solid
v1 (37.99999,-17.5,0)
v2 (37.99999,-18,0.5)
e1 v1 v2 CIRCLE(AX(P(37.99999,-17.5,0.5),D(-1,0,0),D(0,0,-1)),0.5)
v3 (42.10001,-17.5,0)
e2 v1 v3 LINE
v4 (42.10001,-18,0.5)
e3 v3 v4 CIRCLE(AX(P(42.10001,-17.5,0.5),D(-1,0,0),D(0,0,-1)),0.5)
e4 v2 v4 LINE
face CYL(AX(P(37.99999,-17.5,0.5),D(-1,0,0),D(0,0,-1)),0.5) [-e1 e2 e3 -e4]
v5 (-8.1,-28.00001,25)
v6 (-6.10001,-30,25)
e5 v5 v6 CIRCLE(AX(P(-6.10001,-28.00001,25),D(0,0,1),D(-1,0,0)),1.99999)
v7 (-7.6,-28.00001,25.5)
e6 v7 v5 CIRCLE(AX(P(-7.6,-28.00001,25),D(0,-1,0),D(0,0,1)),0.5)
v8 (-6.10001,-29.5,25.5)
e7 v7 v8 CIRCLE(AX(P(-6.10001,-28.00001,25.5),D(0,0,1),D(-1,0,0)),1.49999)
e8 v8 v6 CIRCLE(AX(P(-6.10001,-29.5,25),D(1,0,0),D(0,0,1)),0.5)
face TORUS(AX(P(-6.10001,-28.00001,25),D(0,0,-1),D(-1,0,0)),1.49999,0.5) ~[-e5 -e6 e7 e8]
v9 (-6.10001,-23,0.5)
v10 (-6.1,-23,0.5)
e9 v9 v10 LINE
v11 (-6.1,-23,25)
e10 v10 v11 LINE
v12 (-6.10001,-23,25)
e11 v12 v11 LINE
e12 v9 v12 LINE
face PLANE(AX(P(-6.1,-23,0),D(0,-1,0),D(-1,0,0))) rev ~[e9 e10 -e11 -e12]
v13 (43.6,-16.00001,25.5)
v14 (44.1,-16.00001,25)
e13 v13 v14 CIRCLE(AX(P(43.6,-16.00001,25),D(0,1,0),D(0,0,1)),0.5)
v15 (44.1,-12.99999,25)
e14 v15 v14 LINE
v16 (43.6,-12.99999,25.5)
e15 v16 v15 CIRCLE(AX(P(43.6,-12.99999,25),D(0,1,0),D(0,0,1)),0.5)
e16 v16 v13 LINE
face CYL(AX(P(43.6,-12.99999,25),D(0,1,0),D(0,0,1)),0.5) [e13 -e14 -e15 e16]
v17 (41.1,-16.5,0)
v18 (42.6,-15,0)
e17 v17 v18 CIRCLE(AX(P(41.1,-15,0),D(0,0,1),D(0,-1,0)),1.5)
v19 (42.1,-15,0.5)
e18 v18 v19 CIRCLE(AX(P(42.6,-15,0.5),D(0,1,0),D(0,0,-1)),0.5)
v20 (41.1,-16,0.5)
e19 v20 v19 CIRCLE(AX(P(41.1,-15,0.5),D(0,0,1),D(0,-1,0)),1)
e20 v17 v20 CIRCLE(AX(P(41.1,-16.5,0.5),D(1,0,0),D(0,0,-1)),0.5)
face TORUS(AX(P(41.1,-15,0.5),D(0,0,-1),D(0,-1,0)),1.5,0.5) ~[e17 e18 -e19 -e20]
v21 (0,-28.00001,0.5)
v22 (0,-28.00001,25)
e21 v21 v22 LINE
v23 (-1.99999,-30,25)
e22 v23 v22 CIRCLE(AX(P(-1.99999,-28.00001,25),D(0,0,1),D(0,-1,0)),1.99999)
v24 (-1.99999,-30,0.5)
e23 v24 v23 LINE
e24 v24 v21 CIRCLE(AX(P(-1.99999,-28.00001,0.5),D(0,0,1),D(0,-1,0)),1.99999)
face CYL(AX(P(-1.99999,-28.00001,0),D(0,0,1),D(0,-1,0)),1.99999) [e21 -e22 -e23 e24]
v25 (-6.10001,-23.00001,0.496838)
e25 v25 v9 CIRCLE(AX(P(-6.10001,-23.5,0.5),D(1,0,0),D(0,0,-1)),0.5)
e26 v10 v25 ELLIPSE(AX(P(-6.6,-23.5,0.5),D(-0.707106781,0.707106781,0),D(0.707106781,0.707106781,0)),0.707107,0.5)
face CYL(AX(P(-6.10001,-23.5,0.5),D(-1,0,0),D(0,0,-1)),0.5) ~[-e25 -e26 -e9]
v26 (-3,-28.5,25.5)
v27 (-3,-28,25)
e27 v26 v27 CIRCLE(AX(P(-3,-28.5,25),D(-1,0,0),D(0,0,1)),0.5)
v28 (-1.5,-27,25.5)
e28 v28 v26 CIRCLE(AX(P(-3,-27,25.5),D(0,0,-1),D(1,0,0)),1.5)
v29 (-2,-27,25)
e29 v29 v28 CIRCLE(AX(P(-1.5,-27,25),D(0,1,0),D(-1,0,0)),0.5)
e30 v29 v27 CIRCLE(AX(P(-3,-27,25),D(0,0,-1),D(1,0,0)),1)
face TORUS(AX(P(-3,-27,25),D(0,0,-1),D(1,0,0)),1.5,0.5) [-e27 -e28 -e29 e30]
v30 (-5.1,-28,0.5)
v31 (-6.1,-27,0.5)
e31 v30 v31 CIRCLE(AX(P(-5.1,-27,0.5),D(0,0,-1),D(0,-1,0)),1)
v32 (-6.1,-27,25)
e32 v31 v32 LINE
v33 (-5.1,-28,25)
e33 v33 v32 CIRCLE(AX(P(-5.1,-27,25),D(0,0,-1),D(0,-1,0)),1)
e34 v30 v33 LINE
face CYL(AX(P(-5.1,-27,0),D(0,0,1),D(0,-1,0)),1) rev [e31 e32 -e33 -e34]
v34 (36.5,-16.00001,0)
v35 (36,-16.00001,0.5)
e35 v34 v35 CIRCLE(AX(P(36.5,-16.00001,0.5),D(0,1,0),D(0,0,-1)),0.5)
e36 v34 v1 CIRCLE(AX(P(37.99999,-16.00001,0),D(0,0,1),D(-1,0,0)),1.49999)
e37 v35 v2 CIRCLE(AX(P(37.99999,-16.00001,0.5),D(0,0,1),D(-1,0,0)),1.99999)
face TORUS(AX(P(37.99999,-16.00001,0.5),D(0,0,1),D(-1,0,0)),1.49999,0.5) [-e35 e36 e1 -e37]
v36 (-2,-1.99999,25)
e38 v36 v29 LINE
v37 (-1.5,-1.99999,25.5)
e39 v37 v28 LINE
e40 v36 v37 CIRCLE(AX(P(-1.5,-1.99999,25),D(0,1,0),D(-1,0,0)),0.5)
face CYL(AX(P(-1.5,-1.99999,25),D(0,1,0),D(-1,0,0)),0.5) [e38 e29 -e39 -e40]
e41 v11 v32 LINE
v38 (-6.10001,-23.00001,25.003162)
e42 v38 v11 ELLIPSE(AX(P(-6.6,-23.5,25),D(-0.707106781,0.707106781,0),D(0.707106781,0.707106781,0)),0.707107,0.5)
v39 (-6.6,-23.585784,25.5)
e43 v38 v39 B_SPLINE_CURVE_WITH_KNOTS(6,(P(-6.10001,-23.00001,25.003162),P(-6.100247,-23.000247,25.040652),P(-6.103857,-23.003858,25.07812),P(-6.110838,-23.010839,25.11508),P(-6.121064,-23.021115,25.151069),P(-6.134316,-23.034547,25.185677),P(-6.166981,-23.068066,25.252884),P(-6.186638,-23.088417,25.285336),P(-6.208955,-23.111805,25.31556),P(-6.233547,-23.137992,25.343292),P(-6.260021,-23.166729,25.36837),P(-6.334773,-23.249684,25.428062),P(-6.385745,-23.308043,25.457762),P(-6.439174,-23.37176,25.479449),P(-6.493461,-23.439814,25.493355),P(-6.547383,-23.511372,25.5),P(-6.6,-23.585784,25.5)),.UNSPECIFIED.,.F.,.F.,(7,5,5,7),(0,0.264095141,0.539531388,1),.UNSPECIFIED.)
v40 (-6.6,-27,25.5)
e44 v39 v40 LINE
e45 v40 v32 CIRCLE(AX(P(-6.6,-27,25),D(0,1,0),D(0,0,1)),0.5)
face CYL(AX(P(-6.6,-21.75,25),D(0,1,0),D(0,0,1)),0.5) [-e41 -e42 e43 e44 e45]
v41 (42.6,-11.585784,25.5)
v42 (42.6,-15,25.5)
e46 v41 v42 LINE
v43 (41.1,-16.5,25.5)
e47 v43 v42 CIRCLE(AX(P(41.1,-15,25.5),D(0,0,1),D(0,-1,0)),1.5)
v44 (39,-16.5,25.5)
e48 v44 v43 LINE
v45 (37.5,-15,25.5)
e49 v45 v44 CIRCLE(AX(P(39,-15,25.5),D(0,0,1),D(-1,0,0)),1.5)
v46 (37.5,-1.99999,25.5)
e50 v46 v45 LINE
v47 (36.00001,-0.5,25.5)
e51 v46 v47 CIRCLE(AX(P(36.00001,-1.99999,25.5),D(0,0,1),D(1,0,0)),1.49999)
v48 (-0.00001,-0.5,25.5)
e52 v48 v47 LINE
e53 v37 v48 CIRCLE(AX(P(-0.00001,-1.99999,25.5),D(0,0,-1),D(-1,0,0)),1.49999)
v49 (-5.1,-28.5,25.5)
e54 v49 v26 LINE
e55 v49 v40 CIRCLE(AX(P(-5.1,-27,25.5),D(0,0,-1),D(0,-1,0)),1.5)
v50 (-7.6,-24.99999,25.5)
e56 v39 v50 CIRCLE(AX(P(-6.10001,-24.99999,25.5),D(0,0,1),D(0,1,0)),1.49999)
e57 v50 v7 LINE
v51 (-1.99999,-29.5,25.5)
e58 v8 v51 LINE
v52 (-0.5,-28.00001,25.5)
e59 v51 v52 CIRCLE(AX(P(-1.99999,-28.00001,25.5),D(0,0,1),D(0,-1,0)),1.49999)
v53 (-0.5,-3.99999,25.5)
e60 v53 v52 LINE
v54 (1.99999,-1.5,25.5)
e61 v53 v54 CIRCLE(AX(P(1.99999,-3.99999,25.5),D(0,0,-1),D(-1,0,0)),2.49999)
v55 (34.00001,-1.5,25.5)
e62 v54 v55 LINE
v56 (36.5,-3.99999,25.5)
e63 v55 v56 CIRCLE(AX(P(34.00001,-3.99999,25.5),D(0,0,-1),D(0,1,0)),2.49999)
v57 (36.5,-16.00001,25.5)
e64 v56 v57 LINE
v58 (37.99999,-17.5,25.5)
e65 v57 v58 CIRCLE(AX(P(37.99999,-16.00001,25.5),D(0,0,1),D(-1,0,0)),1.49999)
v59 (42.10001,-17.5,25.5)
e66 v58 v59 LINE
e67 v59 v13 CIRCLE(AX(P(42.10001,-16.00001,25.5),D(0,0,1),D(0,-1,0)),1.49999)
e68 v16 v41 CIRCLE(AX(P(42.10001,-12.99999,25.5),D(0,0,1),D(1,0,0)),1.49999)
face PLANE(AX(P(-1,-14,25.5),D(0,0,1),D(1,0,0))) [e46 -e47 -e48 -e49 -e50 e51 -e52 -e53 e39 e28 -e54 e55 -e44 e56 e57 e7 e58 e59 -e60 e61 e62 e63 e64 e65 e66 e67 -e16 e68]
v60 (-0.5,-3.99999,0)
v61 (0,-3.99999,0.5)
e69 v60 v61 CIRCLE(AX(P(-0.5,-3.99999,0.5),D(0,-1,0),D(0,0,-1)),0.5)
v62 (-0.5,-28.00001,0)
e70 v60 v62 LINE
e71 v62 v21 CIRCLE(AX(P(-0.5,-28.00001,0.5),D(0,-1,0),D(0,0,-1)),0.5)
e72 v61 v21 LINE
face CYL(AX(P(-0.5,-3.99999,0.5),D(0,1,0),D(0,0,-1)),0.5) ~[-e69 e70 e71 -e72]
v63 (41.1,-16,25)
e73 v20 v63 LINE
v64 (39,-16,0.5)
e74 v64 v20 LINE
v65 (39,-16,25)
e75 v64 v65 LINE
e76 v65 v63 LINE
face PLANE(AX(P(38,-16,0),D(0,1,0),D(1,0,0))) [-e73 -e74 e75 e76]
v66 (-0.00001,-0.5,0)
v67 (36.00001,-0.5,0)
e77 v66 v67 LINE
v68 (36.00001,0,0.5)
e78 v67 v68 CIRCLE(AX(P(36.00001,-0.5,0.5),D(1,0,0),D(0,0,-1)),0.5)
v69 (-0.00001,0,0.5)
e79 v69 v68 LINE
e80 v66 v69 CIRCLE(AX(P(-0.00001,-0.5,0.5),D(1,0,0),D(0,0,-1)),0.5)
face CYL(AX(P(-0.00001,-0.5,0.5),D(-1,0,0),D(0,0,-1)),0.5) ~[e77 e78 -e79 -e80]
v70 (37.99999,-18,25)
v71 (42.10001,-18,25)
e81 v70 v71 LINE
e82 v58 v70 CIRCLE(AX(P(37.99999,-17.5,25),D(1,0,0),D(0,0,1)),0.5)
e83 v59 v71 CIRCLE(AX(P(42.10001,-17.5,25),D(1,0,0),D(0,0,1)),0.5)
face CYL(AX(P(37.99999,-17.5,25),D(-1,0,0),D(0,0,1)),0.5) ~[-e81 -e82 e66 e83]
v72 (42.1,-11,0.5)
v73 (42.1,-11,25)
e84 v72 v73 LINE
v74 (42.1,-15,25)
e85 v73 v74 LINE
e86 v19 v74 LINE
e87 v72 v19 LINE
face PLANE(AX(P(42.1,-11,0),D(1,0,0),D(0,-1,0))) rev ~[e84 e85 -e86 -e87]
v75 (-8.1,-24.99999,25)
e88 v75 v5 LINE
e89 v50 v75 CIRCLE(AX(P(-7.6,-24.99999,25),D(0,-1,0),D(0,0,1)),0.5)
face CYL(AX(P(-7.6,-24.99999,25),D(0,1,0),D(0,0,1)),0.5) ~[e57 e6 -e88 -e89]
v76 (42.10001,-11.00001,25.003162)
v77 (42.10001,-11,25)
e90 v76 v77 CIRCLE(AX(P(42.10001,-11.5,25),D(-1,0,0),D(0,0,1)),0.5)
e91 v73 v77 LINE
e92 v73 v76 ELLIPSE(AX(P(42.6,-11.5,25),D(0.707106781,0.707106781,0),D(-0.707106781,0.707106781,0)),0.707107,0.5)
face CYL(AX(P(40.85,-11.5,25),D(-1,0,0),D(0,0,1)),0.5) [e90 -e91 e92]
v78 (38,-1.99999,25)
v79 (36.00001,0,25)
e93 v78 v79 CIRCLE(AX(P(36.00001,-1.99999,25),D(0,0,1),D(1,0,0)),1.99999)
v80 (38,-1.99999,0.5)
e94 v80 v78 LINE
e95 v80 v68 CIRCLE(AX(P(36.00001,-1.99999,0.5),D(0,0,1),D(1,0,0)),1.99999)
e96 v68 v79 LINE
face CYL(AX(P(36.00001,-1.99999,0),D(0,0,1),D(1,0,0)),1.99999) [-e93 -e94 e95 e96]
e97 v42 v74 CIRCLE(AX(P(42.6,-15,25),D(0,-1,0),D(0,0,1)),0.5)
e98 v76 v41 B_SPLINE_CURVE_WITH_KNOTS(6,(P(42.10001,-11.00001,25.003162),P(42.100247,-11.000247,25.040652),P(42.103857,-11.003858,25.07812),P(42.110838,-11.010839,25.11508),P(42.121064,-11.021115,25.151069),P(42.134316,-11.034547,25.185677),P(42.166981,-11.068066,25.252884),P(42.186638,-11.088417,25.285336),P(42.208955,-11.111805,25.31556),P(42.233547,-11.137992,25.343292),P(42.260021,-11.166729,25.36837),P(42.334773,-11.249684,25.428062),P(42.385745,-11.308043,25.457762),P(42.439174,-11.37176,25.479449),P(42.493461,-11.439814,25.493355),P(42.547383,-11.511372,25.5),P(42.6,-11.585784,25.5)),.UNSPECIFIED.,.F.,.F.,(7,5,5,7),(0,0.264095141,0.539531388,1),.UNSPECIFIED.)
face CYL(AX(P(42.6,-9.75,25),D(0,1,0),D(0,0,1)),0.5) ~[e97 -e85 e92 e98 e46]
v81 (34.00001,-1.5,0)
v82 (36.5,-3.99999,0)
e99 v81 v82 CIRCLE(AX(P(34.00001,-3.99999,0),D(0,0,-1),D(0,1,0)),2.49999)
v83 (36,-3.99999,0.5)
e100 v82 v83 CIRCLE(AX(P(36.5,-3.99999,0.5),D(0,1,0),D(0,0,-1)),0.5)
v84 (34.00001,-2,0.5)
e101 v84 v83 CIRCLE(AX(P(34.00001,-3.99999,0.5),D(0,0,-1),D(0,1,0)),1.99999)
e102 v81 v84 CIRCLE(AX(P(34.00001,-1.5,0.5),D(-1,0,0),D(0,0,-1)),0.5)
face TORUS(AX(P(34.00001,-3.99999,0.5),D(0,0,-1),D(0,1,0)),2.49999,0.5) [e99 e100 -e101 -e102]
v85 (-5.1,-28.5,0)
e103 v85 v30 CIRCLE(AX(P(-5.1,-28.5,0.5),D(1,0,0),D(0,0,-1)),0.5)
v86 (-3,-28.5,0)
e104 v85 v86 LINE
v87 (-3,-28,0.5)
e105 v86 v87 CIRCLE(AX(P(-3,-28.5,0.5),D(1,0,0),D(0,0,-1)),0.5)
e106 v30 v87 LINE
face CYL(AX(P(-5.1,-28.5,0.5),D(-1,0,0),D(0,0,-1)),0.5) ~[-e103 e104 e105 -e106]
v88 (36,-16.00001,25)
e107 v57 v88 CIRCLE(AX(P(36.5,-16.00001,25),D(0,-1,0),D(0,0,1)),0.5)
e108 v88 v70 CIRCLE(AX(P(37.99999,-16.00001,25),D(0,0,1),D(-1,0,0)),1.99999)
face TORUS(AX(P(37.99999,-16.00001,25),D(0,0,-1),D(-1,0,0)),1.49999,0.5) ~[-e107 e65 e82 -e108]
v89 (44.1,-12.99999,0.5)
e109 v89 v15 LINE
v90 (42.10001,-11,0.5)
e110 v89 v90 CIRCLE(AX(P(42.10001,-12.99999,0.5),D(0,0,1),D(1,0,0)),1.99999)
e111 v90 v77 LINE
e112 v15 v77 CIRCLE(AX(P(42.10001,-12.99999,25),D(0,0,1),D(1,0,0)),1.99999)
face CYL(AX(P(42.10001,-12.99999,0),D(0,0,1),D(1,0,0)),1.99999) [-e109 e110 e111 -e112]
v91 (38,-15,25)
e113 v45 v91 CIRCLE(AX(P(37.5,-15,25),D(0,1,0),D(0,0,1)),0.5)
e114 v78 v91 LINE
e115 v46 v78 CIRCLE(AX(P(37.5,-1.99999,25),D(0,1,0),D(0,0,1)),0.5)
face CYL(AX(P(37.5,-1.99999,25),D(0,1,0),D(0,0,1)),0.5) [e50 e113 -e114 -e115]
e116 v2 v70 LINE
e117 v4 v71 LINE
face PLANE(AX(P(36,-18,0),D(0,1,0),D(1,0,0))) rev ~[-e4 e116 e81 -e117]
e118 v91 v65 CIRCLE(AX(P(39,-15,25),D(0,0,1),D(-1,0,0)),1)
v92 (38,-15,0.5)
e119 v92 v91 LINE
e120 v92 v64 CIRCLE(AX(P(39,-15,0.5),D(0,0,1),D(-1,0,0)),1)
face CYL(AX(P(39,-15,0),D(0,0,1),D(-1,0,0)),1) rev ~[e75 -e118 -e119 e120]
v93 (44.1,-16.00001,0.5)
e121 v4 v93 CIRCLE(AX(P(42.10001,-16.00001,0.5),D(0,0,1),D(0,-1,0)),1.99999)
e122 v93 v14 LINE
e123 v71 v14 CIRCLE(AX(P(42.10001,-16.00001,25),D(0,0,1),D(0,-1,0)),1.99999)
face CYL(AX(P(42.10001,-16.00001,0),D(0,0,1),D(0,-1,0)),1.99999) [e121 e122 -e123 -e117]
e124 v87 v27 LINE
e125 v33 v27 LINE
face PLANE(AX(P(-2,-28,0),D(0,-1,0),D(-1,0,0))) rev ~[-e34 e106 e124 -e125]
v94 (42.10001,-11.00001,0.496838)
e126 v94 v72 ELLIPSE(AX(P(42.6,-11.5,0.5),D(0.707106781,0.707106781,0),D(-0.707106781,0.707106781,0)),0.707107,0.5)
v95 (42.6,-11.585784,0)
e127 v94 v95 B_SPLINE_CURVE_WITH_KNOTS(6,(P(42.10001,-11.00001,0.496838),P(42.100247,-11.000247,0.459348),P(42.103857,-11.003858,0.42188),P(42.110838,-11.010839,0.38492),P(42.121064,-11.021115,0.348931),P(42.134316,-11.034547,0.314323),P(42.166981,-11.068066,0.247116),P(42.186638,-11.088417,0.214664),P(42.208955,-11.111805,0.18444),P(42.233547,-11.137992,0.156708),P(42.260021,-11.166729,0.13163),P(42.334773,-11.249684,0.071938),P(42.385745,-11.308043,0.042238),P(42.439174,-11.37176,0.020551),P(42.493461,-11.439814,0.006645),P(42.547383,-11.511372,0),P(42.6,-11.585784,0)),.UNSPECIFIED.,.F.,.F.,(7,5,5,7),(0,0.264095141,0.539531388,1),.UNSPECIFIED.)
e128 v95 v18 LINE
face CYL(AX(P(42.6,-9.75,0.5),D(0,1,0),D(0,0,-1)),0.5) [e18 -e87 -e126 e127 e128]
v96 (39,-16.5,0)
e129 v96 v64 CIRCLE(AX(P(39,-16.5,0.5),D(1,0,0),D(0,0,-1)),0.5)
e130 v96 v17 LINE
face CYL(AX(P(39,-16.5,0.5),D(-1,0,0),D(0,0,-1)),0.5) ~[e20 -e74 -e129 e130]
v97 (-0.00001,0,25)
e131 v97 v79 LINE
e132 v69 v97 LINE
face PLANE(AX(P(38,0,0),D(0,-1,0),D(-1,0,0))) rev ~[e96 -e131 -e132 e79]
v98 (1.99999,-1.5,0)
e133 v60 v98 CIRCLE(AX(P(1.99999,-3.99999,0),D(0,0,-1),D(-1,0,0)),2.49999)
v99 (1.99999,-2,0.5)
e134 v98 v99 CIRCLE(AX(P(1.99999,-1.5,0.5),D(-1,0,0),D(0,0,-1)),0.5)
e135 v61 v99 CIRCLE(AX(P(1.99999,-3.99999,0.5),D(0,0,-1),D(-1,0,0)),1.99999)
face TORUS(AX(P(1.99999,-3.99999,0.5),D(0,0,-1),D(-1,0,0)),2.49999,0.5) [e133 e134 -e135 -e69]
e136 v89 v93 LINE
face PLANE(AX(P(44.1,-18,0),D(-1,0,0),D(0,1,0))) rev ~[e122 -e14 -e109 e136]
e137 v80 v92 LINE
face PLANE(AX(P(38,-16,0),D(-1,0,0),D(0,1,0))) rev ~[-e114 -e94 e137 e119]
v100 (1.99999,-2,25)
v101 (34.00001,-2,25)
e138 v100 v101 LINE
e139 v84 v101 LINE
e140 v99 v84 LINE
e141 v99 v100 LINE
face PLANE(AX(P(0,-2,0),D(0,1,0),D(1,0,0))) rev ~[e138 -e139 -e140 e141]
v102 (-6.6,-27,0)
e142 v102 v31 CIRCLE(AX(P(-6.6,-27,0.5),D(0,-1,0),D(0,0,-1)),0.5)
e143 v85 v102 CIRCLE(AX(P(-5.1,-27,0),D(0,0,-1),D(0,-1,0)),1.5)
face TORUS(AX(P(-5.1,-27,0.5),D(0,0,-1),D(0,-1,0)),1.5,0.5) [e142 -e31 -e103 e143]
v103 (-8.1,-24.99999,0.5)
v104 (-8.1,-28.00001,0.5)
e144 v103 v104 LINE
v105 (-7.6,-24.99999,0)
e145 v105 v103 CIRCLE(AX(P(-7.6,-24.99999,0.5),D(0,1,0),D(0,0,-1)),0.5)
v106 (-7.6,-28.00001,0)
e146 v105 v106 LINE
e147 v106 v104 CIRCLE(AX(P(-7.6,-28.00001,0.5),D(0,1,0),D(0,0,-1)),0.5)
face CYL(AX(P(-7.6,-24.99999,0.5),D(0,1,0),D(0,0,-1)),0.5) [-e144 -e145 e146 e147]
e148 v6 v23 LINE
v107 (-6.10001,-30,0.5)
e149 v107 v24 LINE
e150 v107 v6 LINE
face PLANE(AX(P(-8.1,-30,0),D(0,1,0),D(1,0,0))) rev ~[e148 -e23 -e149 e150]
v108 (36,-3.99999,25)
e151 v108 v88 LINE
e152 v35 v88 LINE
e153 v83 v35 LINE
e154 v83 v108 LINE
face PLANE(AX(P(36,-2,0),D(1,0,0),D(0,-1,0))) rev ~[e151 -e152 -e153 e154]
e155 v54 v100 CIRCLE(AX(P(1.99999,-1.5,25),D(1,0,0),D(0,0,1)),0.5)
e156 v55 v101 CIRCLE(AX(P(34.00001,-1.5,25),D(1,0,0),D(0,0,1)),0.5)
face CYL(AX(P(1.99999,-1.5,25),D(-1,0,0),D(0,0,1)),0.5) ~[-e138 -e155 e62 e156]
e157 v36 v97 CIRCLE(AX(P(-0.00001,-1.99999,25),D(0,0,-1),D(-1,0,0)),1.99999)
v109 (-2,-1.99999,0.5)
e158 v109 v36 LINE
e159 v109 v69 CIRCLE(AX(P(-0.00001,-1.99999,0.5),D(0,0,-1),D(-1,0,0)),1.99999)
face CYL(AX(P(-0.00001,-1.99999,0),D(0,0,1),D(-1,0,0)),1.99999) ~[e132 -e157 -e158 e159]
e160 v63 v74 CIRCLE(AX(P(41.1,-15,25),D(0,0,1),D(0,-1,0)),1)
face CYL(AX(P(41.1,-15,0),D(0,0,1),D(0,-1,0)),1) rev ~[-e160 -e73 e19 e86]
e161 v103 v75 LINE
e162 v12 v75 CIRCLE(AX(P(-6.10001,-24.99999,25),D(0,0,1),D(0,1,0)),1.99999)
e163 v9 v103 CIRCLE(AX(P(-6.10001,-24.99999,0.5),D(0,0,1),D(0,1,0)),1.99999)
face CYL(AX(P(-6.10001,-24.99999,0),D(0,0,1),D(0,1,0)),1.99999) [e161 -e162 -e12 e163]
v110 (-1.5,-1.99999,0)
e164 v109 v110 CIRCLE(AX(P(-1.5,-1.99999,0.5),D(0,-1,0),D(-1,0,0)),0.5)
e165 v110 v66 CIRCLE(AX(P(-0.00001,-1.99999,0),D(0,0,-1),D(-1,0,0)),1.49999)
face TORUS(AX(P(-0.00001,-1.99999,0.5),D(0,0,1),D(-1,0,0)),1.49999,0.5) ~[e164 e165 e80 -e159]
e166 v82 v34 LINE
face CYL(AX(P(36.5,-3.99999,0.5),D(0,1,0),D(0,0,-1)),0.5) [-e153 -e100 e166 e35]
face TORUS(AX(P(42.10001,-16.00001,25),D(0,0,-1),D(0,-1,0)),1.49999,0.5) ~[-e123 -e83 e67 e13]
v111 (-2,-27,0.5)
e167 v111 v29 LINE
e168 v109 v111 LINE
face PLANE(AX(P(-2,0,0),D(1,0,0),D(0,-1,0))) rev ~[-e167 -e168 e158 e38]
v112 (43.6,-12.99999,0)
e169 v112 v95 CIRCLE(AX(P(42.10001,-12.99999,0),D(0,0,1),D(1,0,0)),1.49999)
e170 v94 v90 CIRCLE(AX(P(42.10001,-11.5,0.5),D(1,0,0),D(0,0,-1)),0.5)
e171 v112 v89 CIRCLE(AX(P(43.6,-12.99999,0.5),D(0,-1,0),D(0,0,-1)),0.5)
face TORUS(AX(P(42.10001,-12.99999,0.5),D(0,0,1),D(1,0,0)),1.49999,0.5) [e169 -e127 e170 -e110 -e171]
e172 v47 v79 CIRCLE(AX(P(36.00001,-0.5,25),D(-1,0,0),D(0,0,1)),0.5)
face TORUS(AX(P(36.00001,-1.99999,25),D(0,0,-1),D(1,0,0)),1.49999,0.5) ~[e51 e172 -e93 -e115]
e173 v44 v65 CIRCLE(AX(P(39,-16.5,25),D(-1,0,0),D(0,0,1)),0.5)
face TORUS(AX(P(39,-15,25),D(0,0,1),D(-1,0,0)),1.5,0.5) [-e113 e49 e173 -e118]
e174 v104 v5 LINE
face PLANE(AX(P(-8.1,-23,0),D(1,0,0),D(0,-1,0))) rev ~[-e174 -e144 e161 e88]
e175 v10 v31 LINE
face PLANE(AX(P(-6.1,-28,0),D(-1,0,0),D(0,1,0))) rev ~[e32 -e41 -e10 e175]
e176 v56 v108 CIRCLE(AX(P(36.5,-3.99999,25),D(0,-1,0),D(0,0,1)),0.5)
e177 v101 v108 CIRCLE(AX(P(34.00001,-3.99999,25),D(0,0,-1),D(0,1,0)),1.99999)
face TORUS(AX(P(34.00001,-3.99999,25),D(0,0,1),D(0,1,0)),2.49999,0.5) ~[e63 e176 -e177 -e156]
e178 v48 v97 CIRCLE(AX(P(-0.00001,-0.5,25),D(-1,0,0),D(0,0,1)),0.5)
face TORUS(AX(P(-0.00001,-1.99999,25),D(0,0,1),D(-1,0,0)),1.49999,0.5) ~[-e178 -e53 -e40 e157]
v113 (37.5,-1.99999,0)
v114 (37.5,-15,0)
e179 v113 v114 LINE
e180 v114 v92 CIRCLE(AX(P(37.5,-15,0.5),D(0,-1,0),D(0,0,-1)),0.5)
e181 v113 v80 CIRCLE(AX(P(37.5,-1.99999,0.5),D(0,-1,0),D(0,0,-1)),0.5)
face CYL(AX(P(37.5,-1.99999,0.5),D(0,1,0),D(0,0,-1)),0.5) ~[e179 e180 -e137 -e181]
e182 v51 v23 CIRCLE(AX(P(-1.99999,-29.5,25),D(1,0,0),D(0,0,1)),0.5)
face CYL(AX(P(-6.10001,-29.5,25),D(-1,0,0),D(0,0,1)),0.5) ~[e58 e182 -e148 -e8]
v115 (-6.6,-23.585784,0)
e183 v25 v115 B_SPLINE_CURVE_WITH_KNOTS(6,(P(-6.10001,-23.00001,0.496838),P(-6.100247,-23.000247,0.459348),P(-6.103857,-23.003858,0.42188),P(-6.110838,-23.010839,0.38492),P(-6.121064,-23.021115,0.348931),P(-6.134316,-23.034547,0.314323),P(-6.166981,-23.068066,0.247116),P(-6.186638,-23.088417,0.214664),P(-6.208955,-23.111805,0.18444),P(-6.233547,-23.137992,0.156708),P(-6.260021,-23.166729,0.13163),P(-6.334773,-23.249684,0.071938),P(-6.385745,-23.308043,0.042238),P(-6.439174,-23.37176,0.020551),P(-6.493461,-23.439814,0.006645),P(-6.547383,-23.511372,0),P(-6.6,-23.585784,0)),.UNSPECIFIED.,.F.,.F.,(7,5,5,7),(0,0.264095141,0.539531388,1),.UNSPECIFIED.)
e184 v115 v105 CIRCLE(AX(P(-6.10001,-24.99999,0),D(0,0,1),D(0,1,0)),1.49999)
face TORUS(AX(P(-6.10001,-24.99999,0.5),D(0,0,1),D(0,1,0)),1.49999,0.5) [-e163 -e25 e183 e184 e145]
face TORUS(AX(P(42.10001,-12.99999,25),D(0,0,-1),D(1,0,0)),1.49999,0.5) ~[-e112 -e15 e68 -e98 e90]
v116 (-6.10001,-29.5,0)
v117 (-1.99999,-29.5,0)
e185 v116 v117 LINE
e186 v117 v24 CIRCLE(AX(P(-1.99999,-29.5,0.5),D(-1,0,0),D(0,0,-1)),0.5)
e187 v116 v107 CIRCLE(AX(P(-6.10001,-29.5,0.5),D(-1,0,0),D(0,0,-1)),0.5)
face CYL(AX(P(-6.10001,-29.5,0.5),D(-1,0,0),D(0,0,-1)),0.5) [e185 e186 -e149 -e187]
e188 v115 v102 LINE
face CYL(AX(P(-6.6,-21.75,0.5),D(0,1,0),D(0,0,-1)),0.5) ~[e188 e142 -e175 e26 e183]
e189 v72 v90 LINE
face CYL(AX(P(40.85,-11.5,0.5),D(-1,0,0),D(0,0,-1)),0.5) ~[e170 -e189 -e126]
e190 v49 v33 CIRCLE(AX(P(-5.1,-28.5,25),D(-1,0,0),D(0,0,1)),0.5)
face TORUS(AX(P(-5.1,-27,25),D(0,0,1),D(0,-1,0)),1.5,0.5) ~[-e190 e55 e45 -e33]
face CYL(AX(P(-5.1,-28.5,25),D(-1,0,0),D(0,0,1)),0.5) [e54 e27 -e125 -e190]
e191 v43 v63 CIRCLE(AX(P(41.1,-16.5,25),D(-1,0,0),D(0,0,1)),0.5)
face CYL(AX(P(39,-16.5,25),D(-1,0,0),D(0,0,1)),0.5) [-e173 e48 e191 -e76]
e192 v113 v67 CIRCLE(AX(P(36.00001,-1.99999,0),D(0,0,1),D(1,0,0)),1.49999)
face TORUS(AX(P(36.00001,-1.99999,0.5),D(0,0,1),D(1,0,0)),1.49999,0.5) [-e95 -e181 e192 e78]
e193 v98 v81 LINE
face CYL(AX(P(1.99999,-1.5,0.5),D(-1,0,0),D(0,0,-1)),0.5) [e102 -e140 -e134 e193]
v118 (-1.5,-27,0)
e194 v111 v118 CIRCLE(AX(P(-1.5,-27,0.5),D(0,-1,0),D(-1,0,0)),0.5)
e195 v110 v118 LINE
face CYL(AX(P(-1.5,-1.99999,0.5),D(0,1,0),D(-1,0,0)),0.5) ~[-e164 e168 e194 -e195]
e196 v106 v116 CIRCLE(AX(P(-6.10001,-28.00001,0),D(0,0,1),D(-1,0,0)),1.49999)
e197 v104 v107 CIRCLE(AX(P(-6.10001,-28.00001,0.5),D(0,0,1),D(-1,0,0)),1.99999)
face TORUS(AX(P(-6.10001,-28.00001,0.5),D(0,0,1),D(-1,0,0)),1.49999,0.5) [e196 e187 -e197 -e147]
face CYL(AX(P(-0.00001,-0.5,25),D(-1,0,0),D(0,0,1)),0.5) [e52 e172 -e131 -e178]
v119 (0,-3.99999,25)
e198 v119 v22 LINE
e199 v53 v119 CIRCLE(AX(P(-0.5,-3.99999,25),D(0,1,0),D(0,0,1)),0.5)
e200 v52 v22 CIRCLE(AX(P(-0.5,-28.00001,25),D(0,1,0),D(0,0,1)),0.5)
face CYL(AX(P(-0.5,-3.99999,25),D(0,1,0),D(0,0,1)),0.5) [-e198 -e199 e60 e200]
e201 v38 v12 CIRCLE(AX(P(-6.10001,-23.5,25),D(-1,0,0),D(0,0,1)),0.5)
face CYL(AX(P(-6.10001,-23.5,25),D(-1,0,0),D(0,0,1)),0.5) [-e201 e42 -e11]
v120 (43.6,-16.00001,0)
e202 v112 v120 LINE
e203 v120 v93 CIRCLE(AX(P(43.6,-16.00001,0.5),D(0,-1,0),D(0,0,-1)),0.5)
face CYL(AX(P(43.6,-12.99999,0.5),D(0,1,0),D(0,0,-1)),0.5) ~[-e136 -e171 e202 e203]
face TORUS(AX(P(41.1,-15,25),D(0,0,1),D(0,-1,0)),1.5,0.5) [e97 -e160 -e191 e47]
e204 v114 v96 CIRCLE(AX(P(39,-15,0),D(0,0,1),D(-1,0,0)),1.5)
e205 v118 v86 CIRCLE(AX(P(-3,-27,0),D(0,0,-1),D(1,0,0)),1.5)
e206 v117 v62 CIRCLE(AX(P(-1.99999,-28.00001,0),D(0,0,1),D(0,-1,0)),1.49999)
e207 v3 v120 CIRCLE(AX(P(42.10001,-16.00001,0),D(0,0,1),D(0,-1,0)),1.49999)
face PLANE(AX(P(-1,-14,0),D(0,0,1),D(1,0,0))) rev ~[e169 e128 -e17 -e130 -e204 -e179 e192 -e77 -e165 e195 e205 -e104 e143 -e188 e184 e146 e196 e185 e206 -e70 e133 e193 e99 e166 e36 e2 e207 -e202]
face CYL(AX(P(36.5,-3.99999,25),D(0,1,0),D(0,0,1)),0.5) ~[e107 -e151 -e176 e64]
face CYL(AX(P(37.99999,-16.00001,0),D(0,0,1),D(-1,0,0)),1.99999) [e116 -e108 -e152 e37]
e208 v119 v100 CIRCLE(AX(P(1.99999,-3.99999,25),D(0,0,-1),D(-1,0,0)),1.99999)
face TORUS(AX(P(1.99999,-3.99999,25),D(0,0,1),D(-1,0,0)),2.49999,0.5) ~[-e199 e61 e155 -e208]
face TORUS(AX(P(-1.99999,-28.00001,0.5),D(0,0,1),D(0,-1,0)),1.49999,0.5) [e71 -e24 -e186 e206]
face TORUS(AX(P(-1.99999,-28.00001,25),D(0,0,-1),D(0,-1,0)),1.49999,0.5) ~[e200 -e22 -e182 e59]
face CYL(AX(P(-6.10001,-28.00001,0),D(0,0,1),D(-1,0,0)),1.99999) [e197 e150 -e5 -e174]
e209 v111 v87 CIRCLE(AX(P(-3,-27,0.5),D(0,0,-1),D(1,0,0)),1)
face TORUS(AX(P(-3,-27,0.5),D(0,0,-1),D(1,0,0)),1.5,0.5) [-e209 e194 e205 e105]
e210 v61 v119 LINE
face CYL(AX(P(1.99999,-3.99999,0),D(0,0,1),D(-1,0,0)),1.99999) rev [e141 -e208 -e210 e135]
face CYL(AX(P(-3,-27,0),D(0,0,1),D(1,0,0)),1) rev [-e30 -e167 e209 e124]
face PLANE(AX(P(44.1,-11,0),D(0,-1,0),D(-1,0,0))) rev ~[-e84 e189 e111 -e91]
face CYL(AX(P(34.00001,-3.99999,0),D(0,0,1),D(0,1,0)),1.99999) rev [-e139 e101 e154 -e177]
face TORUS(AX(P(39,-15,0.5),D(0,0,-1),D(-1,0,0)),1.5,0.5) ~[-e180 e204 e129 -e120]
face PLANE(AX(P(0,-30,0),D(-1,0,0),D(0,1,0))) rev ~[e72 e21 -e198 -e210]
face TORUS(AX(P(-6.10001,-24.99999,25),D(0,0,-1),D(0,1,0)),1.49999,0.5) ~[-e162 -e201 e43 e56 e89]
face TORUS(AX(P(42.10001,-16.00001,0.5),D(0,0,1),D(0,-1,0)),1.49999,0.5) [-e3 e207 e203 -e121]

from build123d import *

# Parameters (mm, degrees)
F0_W         = 36
F0_H         = 2
F0_W_2       = 2
F0_W_3       = 4.1
F1_DEPTH     = 25.5
F2_R         = 1.99999
F3_R         = 1
F4_T1_DEPTH  = 36.00002
F4_T3_DEPTH  = 32.00002
F4_T5_DEPTH  = 25.00001
F4_T7_DEPTH  = 2.1
F4_T9_DEPTH  = 5.25
F4_T11_DEPTH = 13.00001
F4_T13_DEPTH = 1.25001
F4_T15_DEPTH = 2.1
F4_T17_DEPTH = 3.00002
F4_T19_DEPTH = 5.25
F4_T21_DEPTH = 4.10002
F4_T23_DEPTH = 1.25001
F4_T25_DEPTH = 24.00002
F4_T27_DEPTH = 3.00002
F4_T29_DEPTH = 4.10002
F4_T31_DEPTH = 12.00002
F4_T34_ANGLE = 90
F4_T36_ANGLE = 90
F4_T38_ANGLE = 90
F4_T40_ANGLE = 90
F4_T42_ANGLE = 90
F4_T44_ANGLE = 90
F4_T46_ANGLE = 90
F4_T48_ANGLE = 90
F4_T50_ANGLE = 90
F4_T52_ANGLE = 90
F4_T54_ANGLE = 90
F4_T56_ANGLE = 90
F4_T58_ANGLE = 90
F4_T60_ANGLE = 90
F4_T62_ANGLE = 90
F4_T64_ANGLE = 90
F4_T66_ANGLE = 90
F4_T68_ANGLE = 90
F4_T70_ANGLE = 90
F4_T72_ANGLE = 90
F4_T74_ANGLE = 90
F4_T76_ANGLE = 90
F4_T78_ANGLE = 90
F4_T80_ANGLE = 90
F4_T82_ANGLE = 90
F4_T84_ANGLE = 90
F4_T86_ANGLE = 90
F4_T88_ANGLE = 90


# Not quite as in the source:
# - a fillet or chamfer that OpenCascade refuses, or shapes differently, is made with other operations: its cross-section is extruded or revolved along the edge and cut away or added
# - a fillet or chamfer is up to 0.001 mm smaller than in the source, because OpenCascade refuses the exact size


with BuildPart() as f1:
    # F0 (on Top) → F1 (new body)
    with BuildSketch(Plane.XY):
        Polygon((0, -2), (0, 0), (-2, 0), (-2, -28), (0, -28), align=None)
        with Locations((18, -1)):
            Rectangle(F0_W, F0_H)
        Polygon((38, 0), (36, 0), (36, -2), (36, -16), (38, -16), align=None)
        with Locations((37, -17)):
            Rectangle(F0_W_2, F0_H)
        with Locations((40.05, -17)):
            Rectangle(F0_W_3, F0_H)
        Polygon((42.1, -11), (42.1, -16), (42.1, -18), (44.1, -18), (44.1, -11), align=None)
        Polygon((0, -30), (0, -28), (-2, -28), (-6.1, -28), (-6.1, -30), align=None)
        Polygon((-6.1, -30), (-6.1, -28), (-6.1, -23), (-8.1, -23), (-8.1, -30), align=None)
    extrude(amount=F1_DEPTH)

    # F2 (radius 2 in the source; OpenCascade refuses exactly that, so slightly less here)
    f2_edges = [f1.edges().sort_by_distance(p)[0] for p in [
        (0, -30, 12.75),
        (36, -18, 12.75),
        (-8.1, -30, 12.75),
        (44.1, -18, 12.75),
        (0, -2, 12.75),
        (36, -2, 12.75),
        (-2, 0, 12.75),
        (38, 0, 12.75),
        (44.1, -11, 12.75),
        (-8.1, -23, 12.75),
    ]]
    fillet(f2_edges, radius=F2_R)

    # F3
    f3_edges = [f1.edges().sort_by_distance(p)[0] for p in [
        (-2, -28, 12.75),
        (-6.1, -28, 12.75),
        (42.1, -16, 12.75),
        (38, -16, 12.75),
    ]]
    fillet(f3_edges, radius=F3_R)

    # F4: fillet of radius 0.5 on 58 edges, made by hand

    # F4_s2 → F4_t1 (cut)
    with BuildSketch(Plane.YZ.offset(-1e-05)):
        with BuildLine():
            ThreePointArc((-0.5, 25.5), (-0.1464466094, 25.3535533906), (0, 25))
            Line((0, 25), (0, 25.5))
            Line((0, 25.5), (-0.5, 25.5))
        make_face()
        with BuildLine():
            ThreePointArc((-0.5, 0), (-0.1464466094, 0.1464466094), (0, 0.5))
            Line((0, 0.5), (0, 0))
            Line((0, 0), (-0.5, 0))
        make_face()
    extrude(amount=F4_T1_DEPTH, mode=Mode.SUBTRACT)

    # F4_s4 → F4_t3 (cut)
    with BuildSketch(Plane.YZ.offset(1.99999)):
        with BuildLine():
            ThreePointArc((-1.5, 0), (-1.8535533906, 0.1464466094), (-2, 0.5))
            Line((-2, 0.5), (-2, 0))
            Line((-2, 0), (-1.5, 0))
        make_face()
        with BuildLine():
            ThreePointArc((-1.5, 25.5), (-1.8535533906, 25.3535533906), (-2, 25))
            Line((-2, 25), (-2, 25.5))
            Line((-2, 25.5), (-1.5, 25.5))
        make_face()
    extrude(amount=F4_T3_DEPTH, mode=Mode.SUBTRACT)

    # F4_s6 → F4_t5 (cut)
    with BuildSketch(Plane.XZ.offset(1.99999)):
        with BuildLine():
            ThreePointArc((-2, 25), (-1.8535533906, 25.3535533906), (-1.5, 25.5))
            Line((-1.5, 25.5), (-2, 25.5))
            Line((-2, 25.5), (-2, 25))
        make_face()
        with BuildLine():
            ThreePointArc((-2, 0.5), (-1.8535533906, 0.1464466094), (-1.5, 0))
            Line((-1.5, 0), (-2, 0))
            Line((-2, 0), (-2, 0.5))
        make_face()
    extrude(amount=F4_T5_DEPTH, mode=Mode.SUBTRACT)

    # F4_s8 → F4_t7 (cut)
    with BuildSketch(Plane.YZ.offset(-5.1)):
        with BuildLine():
            ThreePointArc((-28.5, 25.5), (-28.1464466094, 25.3535533906), (-28, 25))
            Line((-28, 25), (-28, 25.5))
            Line((-28, 25.5), (-28.5, 25.5))
        make_face()
        with BuildLine():
            ThreePointArc((-28.5, 0), (-28.1464466094, 0.1464466094), (-28, 0.5))
            Line((-28, 0.5), (-28, 0))
            Line((-28, 0), (-28.5, 0))
        make_face()
    extrude(amount=F4_T7_DEPTH, mode=Mode.SUBTRACT)

    # F4_s10 → F4_t9 (cut)
    with BuildSketch(Plane.XZ.offset(21.75)):
        with BuildLine():
            ThreePointArc((-6.6, 25.5), (-6.2464466094, 25.3535533906), (-6.1, 25))
            Line((-6.1, 25), (-6.1, 25.5))
            Line((-6.1, 25.5), (-6.6, 25.5))
        make_face()
        with BuildLine():
            ThreePointArc((-6.6, 0), (-6.2464466094, 0.1464466094), (-6.1, 0.5))
            Line((-6.1, 0.5), (-6.1, 0))
            Line((-6.1, 0), (-6.6, 0))
        make_face()
    extrude(amount=F4_T9_DEPTH, mode=Mode.SUBTRACT)

    # F4_s12 → F4_t11 (cut)
    with BuildSketch(Plane.XZ.offset(1.99999)):
        with BuildLine():
            ThreePointArc((37.5, 25.5), (37.8535533906, 25.3535533906), (38, 25))
            Line((38, 25), (38, 25.5))
            Line((38, 25.5), (37.5, 25.5))
        make_face()
        with BuildLine():
            ThreePointArc((37.5, 0), (37.8535533906, 0.1464466094), (38, 0.5))
            Line((38, 0.5), (38, 0))
            Line((38, 0), (37.5, 0))
        make_face()
    extrude(amount=F4_T11_DEPTH, mode=Mode.SUBTRACT)

    # F4_s14 → F4_t13 (cut)
    with BuildSketch(Plane.YZ.offset(-6.10001)):
        with BuildLine():
            ThreePointArc((-23.5, 25.5), (-23.1464466094, 25.3535533906), (-23, 25))
            Line((-23, 25), (-23, 25.5))
            Line((-23, 25.5), (-23.5, 25.5))
        make_face()
        with BuildLine():
            ThreePointArc((-23.5, 0), (-23.1464466094, 0.1464466094), (-23, 0.5))
            Line((-23, 0.5), (-23, 0))
            Line((-23, 0), (-23.5, 0))
        make_face()
    extrude(amount=F4_T13_DEPTH, mode=Mode.SUBTRACT)

    # F4_s16 → F4_t15 (cut)
    with BuildSketch(Plane.YZ.offset(39)):
        with BuildLine():
            ThreePointArc((-16.5, 25.5), (-16.1464466094, 25.3535533906), (-16, 25))
            Line((-16, 25), (-16, 25.5))
            Line((-16, 25.5), (-16.5, 25.5))
        make_face()
        with BuildLine():
            ThreePointArc((-16.5, 0), (-16.1464466094, 0.1464466094), (-16, 0.5))
            Line((-16, 0.5), (-16, 0))
            Line((-16, 0), (-16.5, 0))
        make_face()
    extrude(amount=F4_T15_DEPTH, mode=Mode.SUBTRACT)

    # F4_s18 → F4_t17 (cut)
    with BuildSketch(Plane.XZ.offset(24.99999)):
        with BuildLine():
            ThreePointArc((-7.6, 25.5), (-7.9535533906, 25.3535533906), (-8.1, 25))
            Line((-8.1, 25), (-8.1, 25.5))
            Line((-8.1, 25.5), (-7.6, 25.5))
        make_face()
        with BuildLine():
            ThreePointArc((-7.6, 0), (-7.9535533906, 0.1464466094), (-8.1, 0.5))
            Line((-8.1, 0.5), (-8.1, 0))
            Line((-8.1, 0), (-7.6, 0))
        make_face()
    extrude(amount=F4_T17_DEPTH, mode=Mode.SUBTRACT)

    # F4_s20 → F4_t19 (cut)
    with BuildSketch(Plane.XZ.offset(9.75)):
        with BuildLine():
            ThreePointArc((42.6, 25.5), (42.2464466094, 25.3535533906), (42.1, 25))
            Line((42.1, 25), (42.1, 25.5))
            Line((42.1, 25.5), (42.6, 25.5))
        make_face()
        with BuildLine():
            ThreePointArc((42.6, 0), (42.2464466094, 0.1464466094), (42.1, 0.5))
            Line((42.1, 0.5), (42.1, 0))
            Line((42.1, 0), (42.6, 0))
        make_face()
    extrude(amount=F4_T19_DEPTH, mode=Mode.SUBTRACT)

    # F4_s22 → F4_t21 (cut)
    with BuildSketch(Plane.YZ.offset(-6.10001)):
        with BuildLine():
            ThreePointArc((-29.5, 25.5), (-29.8535533906, 25.3535533906), (-30, 25))
            Line((-30, 25), (-30, 25.5))
            Line((-30, 25.5), (-29.5, 25.5))
        make_face()
        with BuildLine():
            ThreePointArc((-29.5, 0), (-29.8535533906, 0.1464466094), (-30, 0.5))
            Line((-30, 0.5), (-30, 0))
            Line((-30, 0), (-29.5, 0))
        make_face()
    extrude(amount=F4_T21_DEPTH, mode=Mode.SUBTRACT)

    # F4_s24 → F4_t23 (cut)
    with BuildSketch(Plane.YZ.offset(40.85)):
        with BuildLine():
            ThreePointArc((-11.5, 25.5), (-11.1464466094, 25.3535533906), (-11, 25))
            Line((-11, 25), (-11, 25.5))
            Line((-11, 25.5), (-11.5, 25.5))
        make_face()
        with BuildLine():
            ThreePointArc((-11.5, 0), (-11.1464466094, 0.1464466094), (-11, 0.5))
            Line((-11, 0.5), (-11, 0))
            Line((-11, 0), (-11.5, 0))
        make_face()
    extrude(amount=F4_T23_DEPTH, mode=Mode.SUBTRACT)

    # F4_s26 → F4_t25 (cut)
    with BuildSketch(Plane.XZ.offset(3.99999)):
        with BuildLine():
            ThreePointArc((-0.5, 25.5), (-0.1464466094, 25.3535533906), (0, 25))
            Line((0, 25), (0, 25.5))
            Line((0, 25.5), (-0.5, 25.5))
        make_face()
        with BuildLine():
            ThreePointArc((-0.5, 0), (-0.1464466094, 0.1464466094), (0, 0.5))
            Line((0, 0.5), (0, 0))
            Line((0, 0), (-0.5, 0))
        make_face()
    extrude(amount=F4_T25_DEPTH, mode=Mode.SUBTRACT)

    # F4_s28 → F4_t27 (cut)
    with BuildSketch(Plane.XZ.offset(12.99999)):
        with BuildLine():
            ThreePointArc((43.6, 25.5), (43.9535533906, 25.3535533906), (44.1, 25))
            Line((44.1, 25), (44.1, 25.5))
            Line((44.1, 25.5), (43.6, 25.5))
        make_face()
        with BuildLine():
            ThreePointArc((43.6, 0), (43.9535533906, 0.1464466094), (44.1, 0.5))
            Line((44.1, 0.5), (44.1, 0))
            Line((44.1, 0), (43.6, 0))
        make_face()
    extrude(amount=F4_T27_DEPTH, mode=Mode.SUBTRACT)

    # F4_s30 → F4_t29 (cut)
    with BuildSketch(Plane.YZ.offset(37.99999)):
        with BuildLine():
            ThreePointArc((-17.5, 25.5), (-17.8535533906, 25.3535533906), (-18, 25))
            Line((-18, 25), (-18, 25.5))
            Line((-18, 25.5), (-17.5, 25.5))
        make_face()
        with BuildLine():
            ThreePointArc((-17.5, 0), (-17.8535533906, 0.1464466094), (-18, 0.5))
            Line((-18, 0.5), (-18, 0))
            Line((-18, 0), (-17.5, 0))
        make_face()
    extrude(amount=F4_T29_DEPTH, mode=Mode.SUBTRACT)

    # F4_s32 → F4_t31 (cut)
    with BuildSketch(Plane.XZ.offset(3.99999)):
        with BuildLine():
            ThreePointArc((36.5, 25.5), (36.1464466094, 25.3535533906), (36, 25))
            Line((36, 25), (36, 25.5))
            Line((36, 25.5), (36.5, 25.5))
        make_face()
        with BuildLine():
            ThreePointArc((36.5, 0), (36.1464466094, 0.1464466094), (36, 0.5))
            Line((36, 0.5), (36, 0))
            Line((36, 0), (36.5, 0))
        make_face()
    extrude(amount=F4_T31_DEPTH, mode=Mode.SUBTRACT)

    # F4_s33 → F4_t34 (revolve, cut)
    with BuildSketch(Plane.XZ.offset(27)):
        with BuildLine():
            ThreePointArc((-2, 25), (-1.8535533906, 25.3535533906), (-1.5, 25.5))
            Line((-1.5, 25.5), (-2, 25.5))
            Line((-2, 25.5), (-2, 25))
        make_face()
    revolve(axis=Axis((-3, -27, 25.5), (0, 0, -1)), revolution_arc=F4_T34_ANGLE, mode=Mode.SUBTRACT)

    # F4_s35 → F4_t36 (revolve, cut)
    with BuildSketch(Plane.XZ.offset(1.99999)):
        with BuildLine():
            ThreePointArc((-2, 25), (-1.8535533906, 25.3535533906), (-1.5, 25.5))
            Line((-1.5, 25.5), (-2, 25.5))
            Line((-2, 25.5), (-2, 25))
        make_face()
    revolve(axis=Axis((-1e-05, -1.99999, 25.5), (0, 0, -1)), revolution_arc=F4_T36_ANGLE, mode=Mode.SUBTRACT)

    # F4_s37 → F4_t38 (revolve, cut)
    with BuildSketch(Plane.YZ.offset(-5.1)):
        with BuildLine():
            ThreePointArc((-28.5, 25.5), (-28.1464466094, 25.3535533906), (-28, 25))
            Line((-28, 25), (-28, 25.5))
            Line((-28, 25.5), (-28.5, 25.5))
        make_face()
    revolve(axis=Axis((-5.1, -27, 25.5), (0, 0, -1)), revolution_arc=F4_T38_ANGLE, mode=Mode.SUBTRACT)

    # F4_s39 → F4_t40 (revolve, cut)
    with BuildSketch(Plane.XZ.offset(1.99999)):
        with BuildLine():
            ThreePointArc((37.5, 25.5), (37.8535533906, 25.3535533906), (38, 25))
            Line((38, 25), (38, 25.5))
            Line((38, 25.5), (37.5, 25.5))
        make_face()
    revolve(axis=Axis((36.00001, -1.99999, 25.5), (0, 0, 1)), revolution_arc=F4_T40_ANGLE, mode=Mode.SUBTRACT)

    # F4_s41 → F4_t42 (revolve, cut)
    with BuildSketch(Plane.XZ.offset(15)):
        with BuildLine():
            ThreePointArc((37.5, 25.5), (37.8535533906, 25.3535533906), (38, 25))
            Line((38, 25), (38, 25.5))
            Line((38, 25.5), (37.5, 25.5))
        make_face()
    revolve(axis=Axis((39, -15, 25.5), (0, 0, 1)), revolution_arc=F4_T42_ANGLE, mode=Mode.SUBTRACT)

    # F4_s43 → F4_t44 (revolve, cut)
    with BuildSketch(Plane.YZ.offset(-6.10001)):
        with BuildLine():
            ThreePointArc((-23.5, 25.5), (-23.1464466094, 25.3535533906), (-23, 25))
            Line((-23, 25), (-23, 25.5))
            Line((-23, 25.5), (-23.5, 25.5))
        make_face()
    revolve(axis=Axis((-6.10001, -24.99999, 25.5), (0, 0, 1)), revolution_arc=F4_T44_ANGLE, mode=Mode.SUBTRACT)

    # F4_s45 → F4_t46 (revolve, cut)
    with BuildSketch(Plane.YZ.offset(41.1)):
        with BuildLine():
            ThreePointArc((-16.5, 25.5), (-16.1464466094, 25.3535533906), (-16, 25))
            Line((-16, 25), (-16, 25.5))
            Line((-16, 25.5), (-16.5, 25.5))
        make_face()
    revolve(axis=Axis((41.1, -15, 25.5), (0, 0, 1)), revolution_arc=F4_T46_ANGLE, mode=Mode.SUBTRACT)

    # F4_s47 → F4_t48 (revolve, cut)
    with BuildSketch(Plane.XZ.offset(28.00001)):
        with BuildLine():
            ThreePointArc((-7.6, 25.5), (-7.9535533906, 25.3535533906), (-8.1, 25))
            Line((-8.1, 25), (-8.1, 25.5))
            Line((-8.1, 25.5), (-7.6, 25.5))
        make_face()
    revolve(axis=Axis((-6.10001, -28.00001, 25.5), (0, 0, 1)), revolution_arc=F4_T48_ANGLE, mode=Mode.SUBTRACT)

    # F4_s49 → F4_t50 (revolve, cut)
    with BuildSketch(Plane.YZ.offset(-1.99999)):
        with BuildLine():
            ThreePointArc((-29.5, 25.5), (-29.8535533906, 25.3535533906), (-30, 25))
            Line((-30, 25), (-30, 25.5))
            Line((-30, 25.5), (-29.5, 25.5))
        make_face()
    revolve(axis=Axis((-1.99999, -28.00001, 25.5), (0, 0, 1)), revolution_arc=F4_T50_ANGLE, mode=Mode.SUBTRACT)

    # F4_s51 → F4_t52 (revolve, cut)
    with BuildSketch(Plane.XZ.offset(12.99999)):
        with BuildLine():
            ThreePointArc((43.6, 25.5), (43.9535533906, 25.3535533906), (44.1, 25))
            Line((44.1, 25), (44.1, 25.5))
            Line((44.1, 25.5), (43.6, 25.5))
        make_face()
    revolve(axis=Axis((42.10001, -12.99999, 25.5), (0, 0, 1)), revolution_arc=F4_T52_ANGLE, mode=Mode.SUBTRACT)

    # F4_s53 → F4_t54 (revolve, cut)
    with BuildSketch(Plane.XZ.offset(3.99999)):
        with BuildLine():
            ThreePointArc((-0.5, 25.5), (-0.1464466094, 25.3535533906), (0, 25))
            Line((0, 25), (0, 25.5))
            Line((0, 25.5), (-0.5, 25.5))
        make_face()
    revolve(axis=Axis((1.99999, -3.99999, 25.5), (0, 0, -1)), revolution_arc=F4_T54_ANGLE, mode=Mode.SUBTRACT)

    # F4_s55 → F4_t56 (revolve, cut)
    with BuildSketch(Plane.YZ.offset(42.10001)):
        with BuildLine():
            ThreePointArc((-17.5, 25.5), (-17.8535533906, 25.3535533906), (-18, 25))
            Line((-18, 25), (-18, 25.5))
            Line((-18, 25.5), (-17.5, 25.5))
        make_face()
    revolve(axis=Axis((42.10001, -16.00001, 25.5), (0, 0, 1)), revolution_arc=F4_T56_ANGLE, mode=Mode.SUBTRACT)

    # F4_s57 → F4_t58 (revolve, cut)
    with BuildSketch(Plane.YZ.offset(34.00001)):
        with BuildLine():
            ThreePointArc((-1.5, 25.5), (-1.8535533906, 25.3535533906), (-2, 25))
            Line((-2, 25), (-2, 25.5))
            Line((-2, 25.5), (-1.5, 25.5))
        make_face()
    revolve(axis=Axis((34.00001, -3.99999, 25.5), (0, 0, -1)), revolution_arc=F4_T58_ANGLE, mode=Mode.SUBTRACT)

    # F4_s59 → F4_t60 (revolve, cut)
    with BuildSketch(Plane.XZ.offset(16.00001)):
        with BuildLine():
            ThreePointArc((36.5, 25.5), (36.1464466094, 25.3535533906), (36, 25))
            Line((36, 25), (36, 25.5))
            Line((36, 25.5), (36.5, 25.5))
        make_face()
    revolve(axis=Axis((37.99999, -16.00001, 25.5), (0, 0, 1)), revolution_arc=F4_T60_ANGLE, mode=Mode.SUBTRACT)

    # F4_s61 → F4_t62 (revolve, cut)
    with BuildSketch(Plane.XZ.offset(27)):
        with BuildLine():
            ThreePointArc((-1.5, 0), (-1.8535533906, 0.1464466094), (-2, 0.5))
            Line((-2, 0.5), (-2, 0))
            Line((-2, 0), (-1.5, 0))
        make_face()
    revolve(axis=Axis((-3, -27, 0), (0, 0, -1)), revolution_arc=F4_T62_ANGLE, mode=Mode.SUBTRACT)

    # F4_s63 → F4_t64 (revolve, cut)
    with BuildSketch(Plane.XZ.offset(1.99999)):
        with BuildLine():
            ThreePointArc((-1.5, 0), (-1.8535533906, 0.1464466094), (-2, 0.5))
            Line((-2, 0.5), (-2, 0))
            Line((-2, 0), (-1.5, 0))
        make_face()
    revolve(axis=Axis((-1e-05, -1.99999, 0), (0, 0, -1)), revolution_arc=F4_T64_ANGLE, mode=Mode.SUBTRACT)

    # F4_s65 → F4_t66 (revolve, cut)
    with BuildSketch(Plane.YZ.offset(-5.1)):
        with BuildLine():
            ThreePointArc((-28.5, 0), (-28.1464466094, 0.1464466094), (-28, 0.5))
            Line((-28, 0.5), (-28, 0))
            Line((-28, 0), (-28.5, 0))
        make_face()
    revolve(axis=Axis((-5.1, -27, 0), (0, 0, -1)), revolution_arc=F4_T66_ANGLE, mode=Mode.SUBTRACT)

    # F4_s67 → F4_t68 (revolve, cut)
    with BuildSketch(Plane.XZ.offset(1.99999)):
        with BuildLine():
            ThreePointArc((37.5, 0), (37.8535533906, 0.1464466094), (38, 0.5))
            Line((38, 0.5), (38, 0))
            Line((38, 0), (37.5, 0))
        make_face()
    revolve(axis=Axis((36.00001, -1.99999, 0), (0, 0, 1)), revolution_arc=F4_T68_ANGLE, mode=Mode.SUBTRACT)

    # F4_s69 → F4_t70 (revolve, cut)
    with BuildSketch(Plane.XZ.offset(15)):
        with BuildLine():
            ThreePointArc((37.5, 0), (37.8535533906, 0.1464466094), (38, 0.5))
            Line((38, 0.5), (38, 0))
            Line((38, 0), (37.5, 0))
        make_face()
    revolve(axis=Axis((39, -15, 0), (0, 0, 1)), revolution_arc=F4_T70_ANGLE, mode=Mode.SUBTRACT)

    # F4_s71 → F4_t72 (revolve, cut)
    with BuildSketch(Plane.YZ.offset(-6.10001)):
        with BuildLine():
            ThreePointArc((-23.5, 0), (-23.1464466094, 0.1464466094), (-23, 0.5))
            Line((-23, 0.5), (-23, 0))
            Line((-23, 0), (-23.5, 0))
        make_face()
    revolve(axis=Axis((-6.10001, -24.99999, 0), (0, 0, 1)), revolution_arc=F4_T72_ANGLE, mode=Mode.SUBTRACT)

    # F4_s73 → F4_t74 (revolve, cut)
    with BuildSketch(Plane.YZ.offset(41.1)):
        with BuildLine():
            ThreePointArc((-16.5, 0), (-16.1464466094, 0.1464466094), (-16, 0.5))
            Line((-16, 0.5), (-16, 0))
            Line((-16, 0), (-16.5, 0))
        make_face()
    revolve(axis=Axis((41.1, -15, 0), (0, 0, 1)), revolution_arc=F4_T74_ANGLE, mode=Mode.SUBTRACT)

    # F4_s75 → F4_t76 (revolve, cut)
    with BuildSketch(Plane.XZ.offset(28.00001)):
        with BuildLine():
            ThreePointArc((-7.6, 0), (-7.9535533906, 0.1464466094), (-8.1, 0.5))
            Line((-8.1, 0.5), (-8.1, 0))
            Line((-8.1, 0), (-7.6, 0))
        make_face()
    revolve(axis=Axis((-6.10001, -28.00001, 0), (0, 0, 1)), revolution_arc=F4_T76_ANGLE, mode=Mode.SUBTRACT)

    # F4_s77 → F4_t78 (revolve, cut)
    with BuildSketch(Plane.YZ.offset(-1.99999)):
        with BuildLine():
            ThreePointArc((-29.5, 0), (-29.8535533906, 0.1464466094), (-30, 0.5))
            Line((-30, 0.5), (-30, 0))
            Line((-30, 0), (-29.5, 0))
        make_face()
    revolve(axis=Axis((-1.99999, -28.00001, 0), (0, 0, 1)), revolution_arc=F4_T78_ANGLE, mode=Mode.SUBTRACT)

    # F4_s79 → F4_t80 (revolve, cut)
    with BuildSketch(Plane.XZ.offset(12.99999)):
        with BuildLine():
            ThreePointArc((43.6, 0), (43.9535533906, 0.1464466094), (44.1, 0.5))
            Line((44.1, 0.5), (44.1, 0))
            Line((44.1, 0), (43.6, 0))
        make_face()
    revolve(axis=Axis((42.10001, -12.99999, 0), (0, 0, 1)), revolution_arc=F4_T80_ANGLE, mode=Mode.SUBTRACT)

    # F4_s81 → F4_t82 (revolve, cut)
    with BuildSketch(Plane.XZ.offset(3.99999)):
        with BuildLine():
            ThreePointArc((-0.5, 0), (-0.1464466094, 0.1464466094), (0, 0.5))
            Line((0, 0.5), (0, 0))
            Line((0, 0), (-0.5, 0))
        make_face()
    revolve(axis=Axis((1.99999, -3.99999, 0), (0, 0, -1)), revolution_arc=F4_T82_ANGLE, mode=Mode.SUBTRACT)

    # F4_s83 → F4_t84 (revolve, cut)
    with BuildSketch(Plane.YZ.offset(42.10001)):
        with BuildLine():
            ThreePointArc((-17.5, 0), (-17.8535533906, 0.1464466094), (-18, 0.5))
            Line((-18, 0.5), (-18, 0))
            Line((-18, 0), (-17.5, 0))
        make_face()
    revolve(axis=Axis((42.10001, -16.00001, 0), (0, 0, 1)), revolution_arc=F4_T84_ANGLE, mode=Mode.SUBTRACT)

    # F4_s85 → F4_t86 (revolve, cut)
    with BuildSketch(Plane.YZ.offset(34.00001)):
        with BuildLine():
            ThreePointArc((-1.5, 0), (-1.8535533906, 0.1464466094), (-2, 0.5))
            Line((-2, 0.5), (-2, 0))
            Line((-2, 0), (-1.5, 0))
        make_face()
    revolve(axis=Axis((34.00001, -3.99999, 0), (0, 0, -1)), revolution_arc=F4_T86_ANGLE, mode=Mode.SUBTRACT)

    # F4_s87 → F4_t88 (revolve, cut)
    with BuildSketch(Plane.XZ.offset(16.00001)):
        with BuildLine():
            ThreePointArc((36.5, 0), (36.1464466094, 0.1464466094), (36, 0.5))
            Line((36, 0.5), (36, 0))
            Line((36, 0), (36.5, 0))
        make_face()
    revolve(axis=Axis((37.99999, -16.00001, 0), (0, 0, 1)), revolution_arc=F4_T88_ANGLE, mode=Mode.SUBTRACT)


solid = f1.part
